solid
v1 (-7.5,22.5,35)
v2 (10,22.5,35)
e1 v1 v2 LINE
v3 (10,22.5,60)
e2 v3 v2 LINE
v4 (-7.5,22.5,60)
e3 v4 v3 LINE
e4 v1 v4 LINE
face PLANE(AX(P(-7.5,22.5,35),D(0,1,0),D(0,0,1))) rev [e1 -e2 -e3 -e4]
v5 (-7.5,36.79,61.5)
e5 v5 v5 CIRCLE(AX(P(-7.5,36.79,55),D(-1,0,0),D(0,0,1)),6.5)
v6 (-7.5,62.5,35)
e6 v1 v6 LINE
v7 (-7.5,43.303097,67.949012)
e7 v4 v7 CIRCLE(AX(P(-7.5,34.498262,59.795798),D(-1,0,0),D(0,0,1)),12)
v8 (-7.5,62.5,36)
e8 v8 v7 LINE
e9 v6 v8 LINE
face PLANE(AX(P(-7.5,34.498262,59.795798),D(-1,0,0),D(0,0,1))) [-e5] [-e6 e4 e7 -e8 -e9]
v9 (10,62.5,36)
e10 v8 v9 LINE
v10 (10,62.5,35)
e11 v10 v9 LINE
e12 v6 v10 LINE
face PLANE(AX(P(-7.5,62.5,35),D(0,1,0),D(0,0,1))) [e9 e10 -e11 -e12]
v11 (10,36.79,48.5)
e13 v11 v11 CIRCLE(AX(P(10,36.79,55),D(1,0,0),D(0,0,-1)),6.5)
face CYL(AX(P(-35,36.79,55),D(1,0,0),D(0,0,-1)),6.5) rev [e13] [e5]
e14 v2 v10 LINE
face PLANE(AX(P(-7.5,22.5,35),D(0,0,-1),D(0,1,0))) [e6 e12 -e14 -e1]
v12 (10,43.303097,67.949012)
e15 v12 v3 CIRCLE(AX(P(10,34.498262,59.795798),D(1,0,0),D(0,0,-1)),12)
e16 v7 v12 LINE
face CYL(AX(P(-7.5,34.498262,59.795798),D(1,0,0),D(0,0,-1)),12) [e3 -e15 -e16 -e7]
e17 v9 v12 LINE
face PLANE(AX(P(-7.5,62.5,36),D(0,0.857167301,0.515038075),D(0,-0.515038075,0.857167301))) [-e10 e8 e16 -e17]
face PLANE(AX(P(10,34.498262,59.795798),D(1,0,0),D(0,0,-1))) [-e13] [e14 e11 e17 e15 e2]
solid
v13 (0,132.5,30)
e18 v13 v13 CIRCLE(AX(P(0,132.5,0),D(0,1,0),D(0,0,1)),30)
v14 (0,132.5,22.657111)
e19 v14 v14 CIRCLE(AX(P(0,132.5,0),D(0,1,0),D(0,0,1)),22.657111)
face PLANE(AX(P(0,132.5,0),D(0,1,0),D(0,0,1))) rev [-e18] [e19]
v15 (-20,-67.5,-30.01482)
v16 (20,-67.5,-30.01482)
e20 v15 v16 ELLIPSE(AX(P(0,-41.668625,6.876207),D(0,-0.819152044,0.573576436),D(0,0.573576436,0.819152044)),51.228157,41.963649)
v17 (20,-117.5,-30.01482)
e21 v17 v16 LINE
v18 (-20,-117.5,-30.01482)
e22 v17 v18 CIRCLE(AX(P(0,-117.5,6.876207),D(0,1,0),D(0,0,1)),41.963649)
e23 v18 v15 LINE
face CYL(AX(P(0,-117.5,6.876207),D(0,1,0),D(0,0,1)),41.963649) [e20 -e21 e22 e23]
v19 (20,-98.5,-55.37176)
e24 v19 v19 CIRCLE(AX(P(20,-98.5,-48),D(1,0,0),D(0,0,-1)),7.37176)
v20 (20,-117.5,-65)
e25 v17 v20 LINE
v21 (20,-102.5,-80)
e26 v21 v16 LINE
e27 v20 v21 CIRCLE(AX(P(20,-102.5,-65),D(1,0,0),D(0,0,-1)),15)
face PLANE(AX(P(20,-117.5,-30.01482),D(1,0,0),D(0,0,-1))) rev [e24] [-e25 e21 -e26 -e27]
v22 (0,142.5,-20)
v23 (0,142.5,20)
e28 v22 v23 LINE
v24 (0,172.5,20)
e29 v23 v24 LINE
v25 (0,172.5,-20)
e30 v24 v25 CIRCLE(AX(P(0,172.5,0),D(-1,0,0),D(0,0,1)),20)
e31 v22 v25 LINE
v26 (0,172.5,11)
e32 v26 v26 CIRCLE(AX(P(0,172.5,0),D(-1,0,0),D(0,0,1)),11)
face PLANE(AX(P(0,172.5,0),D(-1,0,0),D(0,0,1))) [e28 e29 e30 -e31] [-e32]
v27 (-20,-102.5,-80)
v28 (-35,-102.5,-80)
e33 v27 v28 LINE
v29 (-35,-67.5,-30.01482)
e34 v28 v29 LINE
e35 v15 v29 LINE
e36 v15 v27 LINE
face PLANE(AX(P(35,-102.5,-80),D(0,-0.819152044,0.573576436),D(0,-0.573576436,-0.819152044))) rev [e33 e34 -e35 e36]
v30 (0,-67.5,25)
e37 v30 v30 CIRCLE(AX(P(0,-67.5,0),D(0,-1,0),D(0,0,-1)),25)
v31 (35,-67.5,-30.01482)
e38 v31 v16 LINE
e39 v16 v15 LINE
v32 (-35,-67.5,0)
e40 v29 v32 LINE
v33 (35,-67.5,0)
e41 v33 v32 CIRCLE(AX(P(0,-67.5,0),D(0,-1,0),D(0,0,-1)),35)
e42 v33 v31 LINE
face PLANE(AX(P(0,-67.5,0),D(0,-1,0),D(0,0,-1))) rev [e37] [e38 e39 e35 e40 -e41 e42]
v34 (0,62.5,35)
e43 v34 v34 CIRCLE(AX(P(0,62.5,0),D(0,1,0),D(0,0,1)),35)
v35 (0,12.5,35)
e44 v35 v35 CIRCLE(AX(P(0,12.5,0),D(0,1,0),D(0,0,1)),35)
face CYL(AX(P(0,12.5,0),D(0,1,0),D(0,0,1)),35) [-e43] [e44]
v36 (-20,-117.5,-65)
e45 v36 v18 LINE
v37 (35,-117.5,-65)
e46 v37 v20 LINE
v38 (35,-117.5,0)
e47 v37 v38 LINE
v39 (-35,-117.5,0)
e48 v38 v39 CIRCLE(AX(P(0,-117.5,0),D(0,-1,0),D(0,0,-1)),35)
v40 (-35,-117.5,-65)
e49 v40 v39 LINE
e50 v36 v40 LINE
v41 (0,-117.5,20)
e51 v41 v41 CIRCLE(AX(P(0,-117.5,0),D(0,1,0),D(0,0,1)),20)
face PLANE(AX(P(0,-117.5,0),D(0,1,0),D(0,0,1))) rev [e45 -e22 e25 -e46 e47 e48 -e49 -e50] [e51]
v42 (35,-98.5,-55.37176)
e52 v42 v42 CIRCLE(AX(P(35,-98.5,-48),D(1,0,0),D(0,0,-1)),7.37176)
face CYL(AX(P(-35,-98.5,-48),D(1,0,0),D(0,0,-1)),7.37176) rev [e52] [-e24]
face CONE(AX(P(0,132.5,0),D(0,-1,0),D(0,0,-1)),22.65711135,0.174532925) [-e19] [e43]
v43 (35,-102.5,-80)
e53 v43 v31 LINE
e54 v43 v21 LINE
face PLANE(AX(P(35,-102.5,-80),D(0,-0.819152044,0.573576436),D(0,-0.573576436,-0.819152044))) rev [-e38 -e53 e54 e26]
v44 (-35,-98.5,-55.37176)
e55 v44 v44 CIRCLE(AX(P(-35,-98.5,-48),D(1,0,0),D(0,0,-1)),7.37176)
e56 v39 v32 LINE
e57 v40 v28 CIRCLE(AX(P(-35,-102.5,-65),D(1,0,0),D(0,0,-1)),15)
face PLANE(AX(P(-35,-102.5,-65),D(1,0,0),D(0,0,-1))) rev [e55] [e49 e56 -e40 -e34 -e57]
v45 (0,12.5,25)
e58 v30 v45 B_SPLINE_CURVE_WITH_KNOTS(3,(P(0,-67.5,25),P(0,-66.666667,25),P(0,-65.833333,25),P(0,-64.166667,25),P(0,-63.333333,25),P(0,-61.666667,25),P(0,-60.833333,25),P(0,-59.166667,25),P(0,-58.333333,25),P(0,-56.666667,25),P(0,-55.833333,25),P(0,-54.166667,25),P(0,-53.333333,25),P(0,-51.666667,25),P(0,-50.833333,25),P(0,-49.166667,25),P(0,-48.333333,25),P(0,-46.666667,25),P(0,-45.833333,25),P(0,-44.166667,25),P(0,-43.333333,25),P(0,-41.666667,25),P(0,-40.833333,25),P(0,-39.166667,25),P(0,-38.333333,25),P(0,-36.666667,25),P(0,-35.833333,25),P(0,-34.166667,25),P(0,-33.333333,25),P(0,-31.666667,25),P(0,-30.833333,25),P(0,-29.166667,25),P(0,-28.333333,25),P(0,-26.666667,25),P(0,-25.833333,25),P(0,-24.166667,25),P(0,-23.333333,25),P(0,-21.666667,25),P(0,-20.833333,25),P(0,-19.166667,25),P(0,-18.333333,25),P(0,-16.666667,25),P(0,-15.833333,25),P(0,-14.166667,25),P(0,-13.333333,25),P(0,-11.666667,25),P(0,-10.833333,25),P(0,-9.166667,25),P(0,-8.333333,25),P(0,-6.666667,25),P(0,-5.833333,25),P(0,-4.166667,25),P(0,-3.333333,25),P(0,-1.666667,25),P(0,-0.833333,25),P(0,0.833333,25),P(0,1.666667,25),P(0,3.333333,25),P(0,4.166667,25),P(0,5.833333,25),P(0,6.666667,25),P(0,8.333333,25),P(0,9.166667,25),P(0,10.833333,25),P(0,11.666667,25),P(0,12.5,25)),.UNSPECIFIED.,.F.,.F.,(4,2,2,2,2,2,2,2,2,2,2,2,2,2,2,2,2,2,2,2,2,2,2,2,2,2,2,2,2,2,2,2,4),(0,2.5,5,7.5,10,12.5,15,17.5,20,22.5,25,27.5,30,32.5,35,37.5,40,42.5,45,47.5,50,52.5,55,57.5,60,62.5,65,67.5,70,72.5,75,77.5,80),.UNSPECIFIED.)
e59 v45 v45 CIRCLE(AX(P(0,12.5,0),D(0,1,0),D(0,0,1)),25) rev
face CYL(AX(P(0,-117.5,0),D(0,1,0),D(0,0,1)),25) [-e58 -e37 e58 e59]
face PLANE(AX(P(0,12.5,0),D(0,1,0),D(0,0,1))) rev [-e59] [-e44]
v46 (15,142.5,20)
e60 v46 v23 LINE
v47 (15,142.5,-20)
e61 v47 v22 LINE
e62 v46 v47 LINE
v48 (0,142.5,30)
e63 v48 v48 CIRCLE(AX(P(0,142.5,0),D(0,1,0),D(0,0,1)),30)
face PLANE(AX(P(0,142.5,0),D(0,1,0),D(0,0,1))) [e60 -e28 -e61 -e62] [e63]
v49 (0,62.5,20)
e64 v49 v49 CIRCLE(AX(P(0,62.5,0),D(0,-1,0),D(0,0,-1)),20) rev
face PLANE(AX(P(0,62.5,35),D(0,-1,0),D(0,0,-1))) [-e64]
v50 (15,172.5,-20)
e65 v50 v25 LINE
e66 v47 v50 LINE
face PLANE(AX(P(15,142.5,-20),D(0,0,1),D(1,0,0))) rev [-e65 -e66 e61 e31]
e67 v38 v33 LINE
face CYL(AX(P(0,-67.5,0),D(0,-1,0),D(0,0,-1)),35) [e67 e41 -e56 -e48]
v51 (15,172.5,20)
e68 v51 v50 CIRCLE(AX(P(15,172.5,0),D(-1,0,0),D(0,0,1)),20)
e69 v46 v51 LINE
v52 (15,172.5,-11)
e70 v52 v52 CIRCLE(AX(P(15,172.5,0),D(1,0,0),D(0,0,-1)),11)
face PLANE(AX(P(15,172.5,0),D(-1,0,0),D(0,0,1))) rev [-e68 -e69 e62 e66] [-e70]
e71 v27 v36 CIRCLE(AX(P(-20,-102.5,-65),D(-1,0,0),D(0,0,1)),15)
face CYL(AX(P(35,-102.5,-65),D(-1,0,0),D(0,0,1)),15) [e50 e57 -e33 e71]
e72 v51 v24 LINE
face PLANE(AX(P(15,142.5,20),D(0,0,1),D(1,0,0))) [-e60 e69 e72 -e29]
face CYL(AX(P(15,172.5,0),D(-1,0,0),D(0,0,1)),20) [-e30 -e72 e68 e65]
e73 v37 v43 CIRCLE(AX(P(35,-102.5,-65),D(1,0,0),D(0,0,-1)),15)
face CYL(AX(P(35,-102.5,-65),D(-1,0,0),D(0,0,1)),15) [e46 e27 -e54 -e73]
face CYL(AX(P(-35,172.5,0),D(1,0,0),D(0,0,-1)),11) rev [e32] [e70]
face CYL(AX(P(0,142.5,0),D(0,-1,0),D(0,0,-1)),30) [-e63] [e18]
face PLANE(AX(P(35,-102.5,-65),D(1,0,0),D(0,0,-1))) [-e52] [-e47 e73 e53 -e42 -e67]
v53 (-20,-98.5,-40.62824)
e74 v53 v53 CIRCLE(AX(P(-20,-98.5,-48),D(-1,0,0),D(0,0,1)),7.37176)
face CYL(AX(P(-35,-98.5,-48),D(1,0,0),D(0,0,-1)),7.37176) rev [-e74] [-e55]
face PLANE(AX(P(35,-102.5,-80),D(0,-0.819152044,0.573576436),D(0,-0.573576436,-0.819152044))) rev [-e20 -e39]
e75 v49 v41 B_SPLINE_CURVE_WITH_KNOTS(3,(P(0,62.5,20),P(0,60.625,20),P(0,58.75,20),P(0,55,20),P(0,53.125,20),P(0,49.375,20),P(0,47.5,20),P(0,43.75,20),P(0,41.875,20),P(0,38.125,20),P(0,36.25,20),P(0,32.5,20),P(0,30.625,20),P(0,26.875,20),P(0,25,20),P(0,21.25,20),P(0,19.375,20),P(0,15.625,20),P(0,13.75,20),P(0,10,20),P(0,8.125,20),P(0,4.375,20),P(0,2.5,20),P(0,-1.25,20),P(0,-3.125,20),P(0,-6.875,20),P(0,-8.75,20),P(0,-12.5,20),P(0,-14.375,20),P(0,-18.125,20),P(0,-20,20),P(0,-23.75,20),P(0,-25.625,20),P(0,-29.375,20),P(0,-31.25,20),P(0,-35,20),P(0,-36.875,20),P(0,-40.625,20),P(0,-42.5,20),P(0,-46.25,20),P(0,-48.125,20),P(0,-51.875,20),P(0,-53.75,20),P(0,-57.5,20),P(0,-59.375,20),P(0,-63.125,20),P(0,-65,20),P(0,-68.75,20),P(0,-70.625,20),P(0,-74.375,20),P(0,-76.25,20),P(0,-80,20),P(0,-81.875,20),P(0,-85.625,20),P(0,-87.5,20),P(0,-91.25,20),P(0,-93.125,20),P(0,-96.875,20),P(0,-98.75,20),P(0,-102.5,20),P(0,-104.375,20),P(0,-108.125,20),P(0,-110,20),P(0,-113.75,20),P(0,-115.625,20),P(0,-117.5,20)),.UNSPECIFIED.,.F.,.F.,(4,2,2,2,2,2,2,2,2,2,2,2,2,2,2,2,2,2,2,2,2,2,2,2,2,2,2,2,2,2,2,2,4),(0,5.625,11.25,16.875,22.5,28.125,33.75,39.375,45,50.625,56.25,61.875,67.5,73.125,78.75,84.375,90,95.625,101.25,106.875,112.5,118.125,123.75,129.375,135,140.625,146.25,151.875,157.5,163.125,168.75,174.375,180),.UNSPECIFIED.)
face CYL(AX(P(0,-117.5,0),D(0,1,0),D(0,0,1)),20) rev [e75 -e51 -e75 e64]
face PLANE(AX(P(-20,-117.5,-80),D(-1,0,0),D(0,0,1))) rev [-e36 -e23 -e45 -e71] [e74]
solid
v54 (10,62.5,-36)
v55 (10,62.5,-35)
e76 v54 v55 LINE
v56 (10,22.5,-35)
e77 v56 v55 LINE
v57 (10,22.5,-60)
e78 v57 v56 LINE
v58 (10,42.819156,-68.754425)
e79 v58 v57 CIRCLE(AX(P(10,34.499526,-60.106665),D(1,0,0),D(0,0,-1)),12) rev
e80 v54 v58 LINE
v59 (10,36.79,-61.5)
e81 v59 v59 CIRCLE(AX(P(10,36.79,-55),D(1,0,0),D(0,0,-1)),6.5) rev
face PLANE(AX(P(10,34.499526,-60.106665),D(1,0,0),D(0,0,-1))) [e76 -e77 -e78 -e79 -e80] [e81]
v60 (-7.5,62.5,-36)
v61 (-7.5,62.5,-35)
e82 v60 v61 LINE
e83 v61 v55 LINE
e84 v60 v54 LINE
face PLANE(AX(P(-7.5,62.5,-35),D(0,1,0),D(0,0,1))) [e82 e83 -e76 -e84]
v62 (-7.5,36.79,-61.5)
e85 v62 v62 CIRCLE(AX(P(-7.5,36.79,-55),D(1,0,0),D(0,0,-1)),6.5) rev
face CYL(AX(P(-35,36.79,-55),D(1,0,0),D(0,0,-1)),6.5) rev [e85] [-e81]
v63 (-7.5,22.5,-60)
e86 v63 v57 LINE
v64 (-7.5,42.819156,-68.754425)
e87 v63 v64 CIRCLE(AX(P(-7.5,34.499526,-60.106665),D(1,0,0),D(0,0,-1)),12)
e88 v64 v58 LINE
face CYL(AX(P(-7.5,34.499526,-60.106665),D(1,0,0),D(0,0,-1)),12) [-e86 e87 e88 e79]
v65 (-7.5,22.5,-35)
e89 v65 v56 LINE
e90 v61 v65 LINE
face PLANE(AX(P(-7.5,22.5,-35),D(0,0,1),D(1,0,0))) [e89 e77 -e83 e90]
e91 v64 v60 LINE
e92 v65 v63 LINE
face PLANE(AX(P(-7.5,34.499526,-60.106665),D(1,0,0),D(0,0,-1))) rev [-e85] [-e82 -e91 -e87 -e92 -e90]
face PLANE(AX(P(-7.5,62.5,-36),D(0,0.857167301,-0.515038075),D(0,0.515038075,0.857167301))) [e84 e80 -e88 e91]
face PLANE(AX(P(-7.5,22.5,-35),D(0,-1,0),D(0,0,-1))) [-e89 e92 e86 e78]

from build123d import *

# Parameters (mm, degrees)
SKETCH1_R                = 20
BOSS_EXTRUDE1_DEPTH      = 117.5
SKETCH2_R                = 35
BOSS_EXTRUDE2_DEPTH      = 50
SKETCH3_R                = 25
BOSS_EXTRUDE3_DEPTH      = 235
SKETCH1_3_R              = 20
CUT_EXTRUDE1_DEPTH       = 117.5
BOSS_EXTRUDE4_DEPTH      = 35
CUT_EXTRUDE2_DEPTH       = 80
BOSS_EXTRUDE5_START      = -50
BOSS_EXTRUDE5_DEPTH      = 50
BOSS_EXTRUDE6_START      = -50
BOSS_EXTRUDE6_DEPTH      = 50
CUT_EXTRUDE5_DEPTH       = 205.572725455
SKETCH12_R               = 7.371760232
CUT_EXTRUDE6_DEPTH       = 159.449518775
BOSS_EXTRUDE9_START      = -105
SKETCH16_R               = 35
BOSS_EXTRUDE9_DEPTH      = 105
CUT_EXTRUDE9_START       = -55
SKETCH18_R               = 35
CUT_EXTRUDE9_DEPTH       = 55
BOSS_EXTRUDE10_START     = 55
SKETCH19_R               = 25
BOSS_EXTRUDE10_DEPTH     = 55
SKETCH20_R               = 20
CUT_EXTRUDE10_DEPTH      = 251.699022734
SKETCH57_R               = 30
BOSS_EXTRUDE11_DEPTH     = 10
BOSS_EXTRUDE13_DEPTH     = 15
SKETCH59_R               = 11
CUT_EXTRUDE11_DEPTH      = 215.374088919
BOSS_EXTRUDE20_DEPTH     = 42.5
BOSS_EXTRUDE21_DEPTH     = 42.5
CUT_EXTRUDE12_DEPTH      = 25
CUT_EXTRUDE18_START      = -25
CUT_EXTRUDE18_DEPTH      = 25
SKETCH71_W               = 21.239894534
SKETCH71_H               = 33.551769162
CUT_EXTRUDE19_DEPTH      = 25
CUT_EXTRUDE20_DEPTH      = 214.26333487
CUT_EXTRUDE20_DEPTH_BACK = 214.26333487
SKETCH72_R               = 6.5


# Read off the part's stored shape, not the designer's step: Cut-Extrude18
with BuildPart() as part:
    # Sketch1 → Boss-Extrude1 (new, symmetric)
    with BuildSketch(Plane(origin=(0, 0, 0), x_dir=(1, 0, 0), z_dir=(0, 1, 0))):
        with Locations(Location((0, 0, 0), (0, 0, 90))):
            Circle(SKETCH1_R)
    extrude(amount=BOSS_EXTRUDE1_DEPTH, both=True)

    # Sketch2 → Boss-Extrude2 (add)
    with BuildSketch(Plane.XZ.offset(117.5)):
        with Locations(Location((0, 0, 0), (0, 0, 270))):
            Circle(SKETCH2_R)
    extrude(amount=-BOSS_EXTRUDE2_DEPTH)

    # Sketch3 → Boss-Extrude3 (add)
    with BuildSketch(Plane(origin=(0, 117.5, 0), x_dir=(1, 0, 0), z_dir=(0, 1, 0))):
        with Locations(Location((0, 0, 0), (0, 0, 270))):
            Circle(SKETCH3_R)
    extrude(amount=-BOSS_EXTRUDE3_DEPTH)

    # Sketch1<3> → Cut-Extrude1 (cut, symmetric)
    with BuildSketch(Plane(origin=(0, 0, 0), x_dir=(1, 0, 0), z_dir=(0, 1, 0))):
        with Locations(Location((0, 0, 0), (0, 0, 270))):
            Circle(SKETCH1_3_R)
    extrude(amount=CUT_EXTRUDE1_DEPTH, both=True, mode=Mode.SUBTRACT)

    # Sketch4 → Boss-Extrude4 (add, symmetric)
    with BuildSketch(Plane(origin=(0, 0, 0), x_dir=(0, 0, -1), z_dir=(1, 0, 0))):
        with BuildLine():
            Line((30.014819764, -67.5), (30.014819764, -117.5))
            Line((30.014819764, -117.5), (65, -117.5))
            ThreePointArc((65, -117.5), (75.606601718, -113.106601718), (80, -102.5))
            Line((80, -102.5), (30.014819764, -67.5))
        make_face()
    extrude(amount=BOSS_EXTRUDE4_DEPTH, both=True)

    # Sketch5 → Cut-Extrude2 (cut)
    with BuildSketch(Plane(origin=(35, 0, 0), x_dir=(0, 0, -1), z_dir=(1, 0, 0))):
        Polygon((30.014819764, -67.5), (35, -67.5), (35, -70.990660781), align=None)
    extrude(amount=-CUT_EXTRUDE2_DEPTH, mode=Mode.SUBTRACT)

    # Sketch6 → Boss-Extrude5 (add)
    with BuildSketch(Plane(origin=(0, -67.5, 0), x_dir=(1, 0, 0), z_dir=(0, 1, 0)).offset(BOSS_EXTRUDE5_START)):
        with BuildLine():
            Line((-35, 30.014819764), (-35, 0))
            ThreePointArc((-35, 0), (-30.455767215, 17.246629913), (-18.003071808, 30.014819764))
            Line((-18.003071808, 30.014819764), (-35, 30.014819764))
        make_face()
    extrude(amount=BOSS_EXTRUDE5_DEPTH)

    # Sketch7 → Boss-Extrude6 (add)
    with BuildSketch(Plane(origin=(0, -67.5, 0), x_dir=(1, 0, 0), z_dir=(0, 1, 0)).offset(BOSS_EXTRUDE6_START)):
        with BuildLine():
            Line((35, 30.014819764), (35, 0))
            ThreePointArc((35, 0), (30.455767215, 17.246629913), (18.003071808, 30.014819764))
            Line((18.003071808, 30.014819764), (35, 30.014819764))
        make_face()
    extrude(amount=BOSS_EXTRUDE6_DEPTH)

    # Sketch9 → Cut-Extrude5 (cut, through all)
    with BuildSketch(Plane(origin=(0, -67.5, 0), x_dir=(1, 0, 0), z_dir=(0, 1, 0))):
        with BuildLine():
            Line((0, 80), (-20, 80))
            Line((-20, 80), (-20, 30.014819764))
            ThreePointArc((-20, 30.014819764), (0, 35.08744218), (20, 30.014819764))
            Line((20, 30.014819764), (20, 80))
            Line((20, 80), (0, 80))
        make_face()
    extrude(amount=-CUT_EXTRUDE5_DEPTH, mode=Mode.SUBTRACT)

    # Sketch12 → Cut-Extrude6 (cut, through all)
    with BuildSketch(Plane(origin=(35, 0, 0), x_dir=(0, 0, -1), z_dir=(1, 0, 0))):
        with Locations((48, -98.5)):
            Circle(SKETCH12_R)
    extrude(amount=-CUT_EXTRUDE6_DEPTH, mode=Mode.SUBTRACT)

    # Sketch16 → Boss-Extrude9 (add)
    with BuildSketch(Plane(origin=(0, 117.5, 0), x_dir=(1, 0, 0), z_dir=(0, 1, 0)).offset(BOSS_EXTRUDE9_START)):
        with Locations(Location((0, 0, 0), (0, 0, 270))):
            Circle(SKETCH16_R)
    extrude(amount=BOSS_EXTRUDE9_DEPTH)

    # Sketch18 → Cut-Extrude9 (cut)
    with BuildSketch(Plane(origin=(0, 117.5, 0), x_dir=(1, 0, 0), z_dir=(0, 1, 0)).offset(CUT_EXTRUDE9_START)):
        with Locations(Location((0, 0, 0), (0, 0, 270))):
            Circle(SKETCH18_R)
    extrude(amount=CUT_EXTRUDE9_DEPTH, mode=Mode.SUBTRACT)

    # Sketch19 → Boss-Extrude10 (add)
    with BuildSketch(Plane(origin=(0, 62.5, 0), x_dir=(1, 0, 0), z_dir=(0, 1, 0)).offset(BOSS_EXTRUDE10_START)):
        with Locations(Location((0, 0, 0), (0, 0, 270))):
            Circle(SKETCH19_R)
    extrude(amount=-BOSS_EXTRUDE10_DEPTH)

    # Sketch20 → Cut-Extrude10 (cut, through all)
    with BuildSketch(Plane(origin=(0, 117.5, 0), x_dir=(1, 0, 0), z_dir=(0, 1, 0))):
        with Locations(Location((0, 0, 0), (0, 0, 270))):
            Circle(SKETCH20_R)
    extrude(amount=-CUT_EXTRUDE10_DEPTH, mode=Mode.SUBTRACT)

    # Sketch21 → Revolve1 (revolve)
    with BuildSketch(Plane(origin=(0, 0, 0), x_dir=(0, 0, -1), z_dir=(1, 0, 0))):
        Polygon((-35, 62.5), (-22.65711135, 132.5), (0, 132.5), (0, 62.5), align=None)
    revolve(axis=Axis((0, 132.5, 0), (0, -1, 0)))

    # Sketch57 → Boss-Extrude11 (add)
    with BuildSketch(Plane(origin=(0, 132.5, 0), x_dir=(1, 0, 0), z_dir=(0, 1, 0))):
        with Locations(Location((0, 0, 0), (0, 0, 270))):
            Circle(SKETCH57_R)
    extrude(amount=BOSS_EXTRUDE11_DEPTH)

    # Sketch58 → Boss-Extrude13 (add)
    with BuildSketch(Plane(origin=(0, 0, 0), x_dir=(0, 0, -1), z_dir=(1, 0, 0))):
        with BuildLine():
            Line((0, 142.5), (-20, 142.5))
            Line((-20, 142.5), (-20, 172.5))
            ThreePointArc((-20, 172.5), (0, 192.5), (20, 172.5))
            Line((20, 172.5), (20, 142.5))
            Line((20, 142.5), (0, 142.5))
        make_face()
    extrude(amount=BOSS_EXTRUDE13_DEPTH)

    # Sketch59 → Cut-Extrude11 (cut, through all)
    with BuildSketch(Plane(origin=(15, 0, 0), x_dir=(0, 0, -1), z_dir=(1, 0, 0))):
        with Locations((0, 172.5)):
            Circle(SKETCH59_R)
    extrude(amount=-CUT_EXTRUDE11_DEPTH, mode=Mode.SUBTRACT)


with BuildPart() as body_2:
    # Sketch61 → Boss-Extrude20 (new body)
    with BuildSketch(Plane(origin=(35, 0, 0), x_dir=(0, 0, -1), z_dir=(1, 0, 0))):
        with BuildLine():
            Line((-35, 22.5), (-60, 22.5))
            ThreePointArc((-60, 22.5), (-71.005339309, 30.215016925), (-67.94901172, 43.303097041))
            Line((-67.94901172, 43.303097041), (-36, 62.5))
            Line((-36, 62.5), (-35, 62.5))
            Line((-35, 62.5), (-35, 22.5))
        make_face()
    extrude(amount=-BOSS_EXTRUDE20_DEPTH)

    # Sketch66 → Cut-Extrude12 (cut)
    with BuildSketch(Plane(origin=(35, 0, 0), x_dir=(0, 0, -1), z_dir=(1, 0, 0))):
        with BuildLine():
            Line((-35, 22.5), (-60, 22.5))
            ThreePointArc((-60, 22.5), (-71.005339309, 30.215016925), (-67.94901172, 43.303097041))
            Line((-67.94901172, 43.303097041), (-36, 62.5))
            Line((-36, 62.5), (-35, 62.5))
            Line((-35, 62.5), (-35, 22.5))
        make_face()
    extrude(amount=-CUT_EXTRUDE12_DEPTH, mode=Mode.SUBTRACT)


with BuildPart() as body_3:
    # Sketch65 → Boss-Extrude21 (new body)
    with BuildSketch(Plane(origin=(35, 0, 0), x_dir=(0, 0, -1), z_dir=(1, 0, 0))):
        with BuildLine():
            Line((35, 22.5), (60, 22.5))
            ThreePointArc((60, 22.5), (71.127309171, 29.751326397), (68.754425185, 42.819155807))
            Line((68.754425185, 42.819155807), (36, 62.5))
            Line((36, 62.5), (35, 62.5))
            Line((35, 62.5), (35, 22.5))
        make_face()
    extrude(amount=-BOSS_EXTRUDE21_DEPTH)

    # Cut-Extrude18 outline → Cut-Extrude18 (cut)
    with BuildSketch(Plane(origin=(35, 0, 0), x_dir=(0, 0, -1), z_dir=(1, 0, 0)).offset(CUT_EXTRUDE18_START)):
        with BuildLine():
            ThreePointArc((60, 22.5), (71.062414441, 29.779286026), (68.754425185, 42.819155807))
            Line((68.754425185, 42.819155807), (36, 62.5))
            Line((36, 62.5), (35, 62.5))
            Line((35, 62.5), (35, 22.5))
            Line((35, 22.5), (60, 22.5))
        make_face()
    extrude(amount=CUT_EXTRUDE18_DEPTH, mode=Mode.SUBTRACT)

    # Sketch71 → Cut-Extrude19 (cut)
    with BuildSketch(Plane(origin=(10, 0, 0), x_dir=(0, 0, -1), z_dir=(1, 0, 0))):
        with Locations((67.690155939, 35.883693323)):
            Rectangle(SKETCH71_W, SKETCH71_H)
    extrude(amount=CUT_EXTRUDE19_DEPTH, mode=Mode.SUBTRACT)


with BuildPart() as cut_extrude20_tool:
    # Sketch72 → Cut-Extrude20 (new, two sides: drawn at the far end of the back side and taken through both)
    with BuildSketch(Plane(origin=(10, 0, 0), x_dir=(0, 0, -1), z_dir=(1, 0, 0)).offset(-CUT_EXTRUDE20_DEPTH_BACK)):
        with Locations((-55, 36.79)):
            Circle(SKETCH72_R)
        with Locations((55, 36.79)):
            Circle(SKETCH72_R)
    extrude(amount=CUT_EXTRUDE20_DEPTH + CUT_EXTRUDE20_DEPTH_BACK)


with BuildPart() as body_2_1:
    add(body_2.part)

    # Cut-Extrude20: cut by cut_extrude20_tool
    add(cut_extrude20_tool.part, mode=Mode.SUBTRACT)


with BuildPart() as body_3_1:
    add(body_3.part)

    # Cut-Extrude20: cut by cut_extrude20_tool
    add(cut_extrude20_tool.part, mode=Mode.SUBTRACT)


solid = Compound([part.part, body_2_1.part, body_3_1.part])
